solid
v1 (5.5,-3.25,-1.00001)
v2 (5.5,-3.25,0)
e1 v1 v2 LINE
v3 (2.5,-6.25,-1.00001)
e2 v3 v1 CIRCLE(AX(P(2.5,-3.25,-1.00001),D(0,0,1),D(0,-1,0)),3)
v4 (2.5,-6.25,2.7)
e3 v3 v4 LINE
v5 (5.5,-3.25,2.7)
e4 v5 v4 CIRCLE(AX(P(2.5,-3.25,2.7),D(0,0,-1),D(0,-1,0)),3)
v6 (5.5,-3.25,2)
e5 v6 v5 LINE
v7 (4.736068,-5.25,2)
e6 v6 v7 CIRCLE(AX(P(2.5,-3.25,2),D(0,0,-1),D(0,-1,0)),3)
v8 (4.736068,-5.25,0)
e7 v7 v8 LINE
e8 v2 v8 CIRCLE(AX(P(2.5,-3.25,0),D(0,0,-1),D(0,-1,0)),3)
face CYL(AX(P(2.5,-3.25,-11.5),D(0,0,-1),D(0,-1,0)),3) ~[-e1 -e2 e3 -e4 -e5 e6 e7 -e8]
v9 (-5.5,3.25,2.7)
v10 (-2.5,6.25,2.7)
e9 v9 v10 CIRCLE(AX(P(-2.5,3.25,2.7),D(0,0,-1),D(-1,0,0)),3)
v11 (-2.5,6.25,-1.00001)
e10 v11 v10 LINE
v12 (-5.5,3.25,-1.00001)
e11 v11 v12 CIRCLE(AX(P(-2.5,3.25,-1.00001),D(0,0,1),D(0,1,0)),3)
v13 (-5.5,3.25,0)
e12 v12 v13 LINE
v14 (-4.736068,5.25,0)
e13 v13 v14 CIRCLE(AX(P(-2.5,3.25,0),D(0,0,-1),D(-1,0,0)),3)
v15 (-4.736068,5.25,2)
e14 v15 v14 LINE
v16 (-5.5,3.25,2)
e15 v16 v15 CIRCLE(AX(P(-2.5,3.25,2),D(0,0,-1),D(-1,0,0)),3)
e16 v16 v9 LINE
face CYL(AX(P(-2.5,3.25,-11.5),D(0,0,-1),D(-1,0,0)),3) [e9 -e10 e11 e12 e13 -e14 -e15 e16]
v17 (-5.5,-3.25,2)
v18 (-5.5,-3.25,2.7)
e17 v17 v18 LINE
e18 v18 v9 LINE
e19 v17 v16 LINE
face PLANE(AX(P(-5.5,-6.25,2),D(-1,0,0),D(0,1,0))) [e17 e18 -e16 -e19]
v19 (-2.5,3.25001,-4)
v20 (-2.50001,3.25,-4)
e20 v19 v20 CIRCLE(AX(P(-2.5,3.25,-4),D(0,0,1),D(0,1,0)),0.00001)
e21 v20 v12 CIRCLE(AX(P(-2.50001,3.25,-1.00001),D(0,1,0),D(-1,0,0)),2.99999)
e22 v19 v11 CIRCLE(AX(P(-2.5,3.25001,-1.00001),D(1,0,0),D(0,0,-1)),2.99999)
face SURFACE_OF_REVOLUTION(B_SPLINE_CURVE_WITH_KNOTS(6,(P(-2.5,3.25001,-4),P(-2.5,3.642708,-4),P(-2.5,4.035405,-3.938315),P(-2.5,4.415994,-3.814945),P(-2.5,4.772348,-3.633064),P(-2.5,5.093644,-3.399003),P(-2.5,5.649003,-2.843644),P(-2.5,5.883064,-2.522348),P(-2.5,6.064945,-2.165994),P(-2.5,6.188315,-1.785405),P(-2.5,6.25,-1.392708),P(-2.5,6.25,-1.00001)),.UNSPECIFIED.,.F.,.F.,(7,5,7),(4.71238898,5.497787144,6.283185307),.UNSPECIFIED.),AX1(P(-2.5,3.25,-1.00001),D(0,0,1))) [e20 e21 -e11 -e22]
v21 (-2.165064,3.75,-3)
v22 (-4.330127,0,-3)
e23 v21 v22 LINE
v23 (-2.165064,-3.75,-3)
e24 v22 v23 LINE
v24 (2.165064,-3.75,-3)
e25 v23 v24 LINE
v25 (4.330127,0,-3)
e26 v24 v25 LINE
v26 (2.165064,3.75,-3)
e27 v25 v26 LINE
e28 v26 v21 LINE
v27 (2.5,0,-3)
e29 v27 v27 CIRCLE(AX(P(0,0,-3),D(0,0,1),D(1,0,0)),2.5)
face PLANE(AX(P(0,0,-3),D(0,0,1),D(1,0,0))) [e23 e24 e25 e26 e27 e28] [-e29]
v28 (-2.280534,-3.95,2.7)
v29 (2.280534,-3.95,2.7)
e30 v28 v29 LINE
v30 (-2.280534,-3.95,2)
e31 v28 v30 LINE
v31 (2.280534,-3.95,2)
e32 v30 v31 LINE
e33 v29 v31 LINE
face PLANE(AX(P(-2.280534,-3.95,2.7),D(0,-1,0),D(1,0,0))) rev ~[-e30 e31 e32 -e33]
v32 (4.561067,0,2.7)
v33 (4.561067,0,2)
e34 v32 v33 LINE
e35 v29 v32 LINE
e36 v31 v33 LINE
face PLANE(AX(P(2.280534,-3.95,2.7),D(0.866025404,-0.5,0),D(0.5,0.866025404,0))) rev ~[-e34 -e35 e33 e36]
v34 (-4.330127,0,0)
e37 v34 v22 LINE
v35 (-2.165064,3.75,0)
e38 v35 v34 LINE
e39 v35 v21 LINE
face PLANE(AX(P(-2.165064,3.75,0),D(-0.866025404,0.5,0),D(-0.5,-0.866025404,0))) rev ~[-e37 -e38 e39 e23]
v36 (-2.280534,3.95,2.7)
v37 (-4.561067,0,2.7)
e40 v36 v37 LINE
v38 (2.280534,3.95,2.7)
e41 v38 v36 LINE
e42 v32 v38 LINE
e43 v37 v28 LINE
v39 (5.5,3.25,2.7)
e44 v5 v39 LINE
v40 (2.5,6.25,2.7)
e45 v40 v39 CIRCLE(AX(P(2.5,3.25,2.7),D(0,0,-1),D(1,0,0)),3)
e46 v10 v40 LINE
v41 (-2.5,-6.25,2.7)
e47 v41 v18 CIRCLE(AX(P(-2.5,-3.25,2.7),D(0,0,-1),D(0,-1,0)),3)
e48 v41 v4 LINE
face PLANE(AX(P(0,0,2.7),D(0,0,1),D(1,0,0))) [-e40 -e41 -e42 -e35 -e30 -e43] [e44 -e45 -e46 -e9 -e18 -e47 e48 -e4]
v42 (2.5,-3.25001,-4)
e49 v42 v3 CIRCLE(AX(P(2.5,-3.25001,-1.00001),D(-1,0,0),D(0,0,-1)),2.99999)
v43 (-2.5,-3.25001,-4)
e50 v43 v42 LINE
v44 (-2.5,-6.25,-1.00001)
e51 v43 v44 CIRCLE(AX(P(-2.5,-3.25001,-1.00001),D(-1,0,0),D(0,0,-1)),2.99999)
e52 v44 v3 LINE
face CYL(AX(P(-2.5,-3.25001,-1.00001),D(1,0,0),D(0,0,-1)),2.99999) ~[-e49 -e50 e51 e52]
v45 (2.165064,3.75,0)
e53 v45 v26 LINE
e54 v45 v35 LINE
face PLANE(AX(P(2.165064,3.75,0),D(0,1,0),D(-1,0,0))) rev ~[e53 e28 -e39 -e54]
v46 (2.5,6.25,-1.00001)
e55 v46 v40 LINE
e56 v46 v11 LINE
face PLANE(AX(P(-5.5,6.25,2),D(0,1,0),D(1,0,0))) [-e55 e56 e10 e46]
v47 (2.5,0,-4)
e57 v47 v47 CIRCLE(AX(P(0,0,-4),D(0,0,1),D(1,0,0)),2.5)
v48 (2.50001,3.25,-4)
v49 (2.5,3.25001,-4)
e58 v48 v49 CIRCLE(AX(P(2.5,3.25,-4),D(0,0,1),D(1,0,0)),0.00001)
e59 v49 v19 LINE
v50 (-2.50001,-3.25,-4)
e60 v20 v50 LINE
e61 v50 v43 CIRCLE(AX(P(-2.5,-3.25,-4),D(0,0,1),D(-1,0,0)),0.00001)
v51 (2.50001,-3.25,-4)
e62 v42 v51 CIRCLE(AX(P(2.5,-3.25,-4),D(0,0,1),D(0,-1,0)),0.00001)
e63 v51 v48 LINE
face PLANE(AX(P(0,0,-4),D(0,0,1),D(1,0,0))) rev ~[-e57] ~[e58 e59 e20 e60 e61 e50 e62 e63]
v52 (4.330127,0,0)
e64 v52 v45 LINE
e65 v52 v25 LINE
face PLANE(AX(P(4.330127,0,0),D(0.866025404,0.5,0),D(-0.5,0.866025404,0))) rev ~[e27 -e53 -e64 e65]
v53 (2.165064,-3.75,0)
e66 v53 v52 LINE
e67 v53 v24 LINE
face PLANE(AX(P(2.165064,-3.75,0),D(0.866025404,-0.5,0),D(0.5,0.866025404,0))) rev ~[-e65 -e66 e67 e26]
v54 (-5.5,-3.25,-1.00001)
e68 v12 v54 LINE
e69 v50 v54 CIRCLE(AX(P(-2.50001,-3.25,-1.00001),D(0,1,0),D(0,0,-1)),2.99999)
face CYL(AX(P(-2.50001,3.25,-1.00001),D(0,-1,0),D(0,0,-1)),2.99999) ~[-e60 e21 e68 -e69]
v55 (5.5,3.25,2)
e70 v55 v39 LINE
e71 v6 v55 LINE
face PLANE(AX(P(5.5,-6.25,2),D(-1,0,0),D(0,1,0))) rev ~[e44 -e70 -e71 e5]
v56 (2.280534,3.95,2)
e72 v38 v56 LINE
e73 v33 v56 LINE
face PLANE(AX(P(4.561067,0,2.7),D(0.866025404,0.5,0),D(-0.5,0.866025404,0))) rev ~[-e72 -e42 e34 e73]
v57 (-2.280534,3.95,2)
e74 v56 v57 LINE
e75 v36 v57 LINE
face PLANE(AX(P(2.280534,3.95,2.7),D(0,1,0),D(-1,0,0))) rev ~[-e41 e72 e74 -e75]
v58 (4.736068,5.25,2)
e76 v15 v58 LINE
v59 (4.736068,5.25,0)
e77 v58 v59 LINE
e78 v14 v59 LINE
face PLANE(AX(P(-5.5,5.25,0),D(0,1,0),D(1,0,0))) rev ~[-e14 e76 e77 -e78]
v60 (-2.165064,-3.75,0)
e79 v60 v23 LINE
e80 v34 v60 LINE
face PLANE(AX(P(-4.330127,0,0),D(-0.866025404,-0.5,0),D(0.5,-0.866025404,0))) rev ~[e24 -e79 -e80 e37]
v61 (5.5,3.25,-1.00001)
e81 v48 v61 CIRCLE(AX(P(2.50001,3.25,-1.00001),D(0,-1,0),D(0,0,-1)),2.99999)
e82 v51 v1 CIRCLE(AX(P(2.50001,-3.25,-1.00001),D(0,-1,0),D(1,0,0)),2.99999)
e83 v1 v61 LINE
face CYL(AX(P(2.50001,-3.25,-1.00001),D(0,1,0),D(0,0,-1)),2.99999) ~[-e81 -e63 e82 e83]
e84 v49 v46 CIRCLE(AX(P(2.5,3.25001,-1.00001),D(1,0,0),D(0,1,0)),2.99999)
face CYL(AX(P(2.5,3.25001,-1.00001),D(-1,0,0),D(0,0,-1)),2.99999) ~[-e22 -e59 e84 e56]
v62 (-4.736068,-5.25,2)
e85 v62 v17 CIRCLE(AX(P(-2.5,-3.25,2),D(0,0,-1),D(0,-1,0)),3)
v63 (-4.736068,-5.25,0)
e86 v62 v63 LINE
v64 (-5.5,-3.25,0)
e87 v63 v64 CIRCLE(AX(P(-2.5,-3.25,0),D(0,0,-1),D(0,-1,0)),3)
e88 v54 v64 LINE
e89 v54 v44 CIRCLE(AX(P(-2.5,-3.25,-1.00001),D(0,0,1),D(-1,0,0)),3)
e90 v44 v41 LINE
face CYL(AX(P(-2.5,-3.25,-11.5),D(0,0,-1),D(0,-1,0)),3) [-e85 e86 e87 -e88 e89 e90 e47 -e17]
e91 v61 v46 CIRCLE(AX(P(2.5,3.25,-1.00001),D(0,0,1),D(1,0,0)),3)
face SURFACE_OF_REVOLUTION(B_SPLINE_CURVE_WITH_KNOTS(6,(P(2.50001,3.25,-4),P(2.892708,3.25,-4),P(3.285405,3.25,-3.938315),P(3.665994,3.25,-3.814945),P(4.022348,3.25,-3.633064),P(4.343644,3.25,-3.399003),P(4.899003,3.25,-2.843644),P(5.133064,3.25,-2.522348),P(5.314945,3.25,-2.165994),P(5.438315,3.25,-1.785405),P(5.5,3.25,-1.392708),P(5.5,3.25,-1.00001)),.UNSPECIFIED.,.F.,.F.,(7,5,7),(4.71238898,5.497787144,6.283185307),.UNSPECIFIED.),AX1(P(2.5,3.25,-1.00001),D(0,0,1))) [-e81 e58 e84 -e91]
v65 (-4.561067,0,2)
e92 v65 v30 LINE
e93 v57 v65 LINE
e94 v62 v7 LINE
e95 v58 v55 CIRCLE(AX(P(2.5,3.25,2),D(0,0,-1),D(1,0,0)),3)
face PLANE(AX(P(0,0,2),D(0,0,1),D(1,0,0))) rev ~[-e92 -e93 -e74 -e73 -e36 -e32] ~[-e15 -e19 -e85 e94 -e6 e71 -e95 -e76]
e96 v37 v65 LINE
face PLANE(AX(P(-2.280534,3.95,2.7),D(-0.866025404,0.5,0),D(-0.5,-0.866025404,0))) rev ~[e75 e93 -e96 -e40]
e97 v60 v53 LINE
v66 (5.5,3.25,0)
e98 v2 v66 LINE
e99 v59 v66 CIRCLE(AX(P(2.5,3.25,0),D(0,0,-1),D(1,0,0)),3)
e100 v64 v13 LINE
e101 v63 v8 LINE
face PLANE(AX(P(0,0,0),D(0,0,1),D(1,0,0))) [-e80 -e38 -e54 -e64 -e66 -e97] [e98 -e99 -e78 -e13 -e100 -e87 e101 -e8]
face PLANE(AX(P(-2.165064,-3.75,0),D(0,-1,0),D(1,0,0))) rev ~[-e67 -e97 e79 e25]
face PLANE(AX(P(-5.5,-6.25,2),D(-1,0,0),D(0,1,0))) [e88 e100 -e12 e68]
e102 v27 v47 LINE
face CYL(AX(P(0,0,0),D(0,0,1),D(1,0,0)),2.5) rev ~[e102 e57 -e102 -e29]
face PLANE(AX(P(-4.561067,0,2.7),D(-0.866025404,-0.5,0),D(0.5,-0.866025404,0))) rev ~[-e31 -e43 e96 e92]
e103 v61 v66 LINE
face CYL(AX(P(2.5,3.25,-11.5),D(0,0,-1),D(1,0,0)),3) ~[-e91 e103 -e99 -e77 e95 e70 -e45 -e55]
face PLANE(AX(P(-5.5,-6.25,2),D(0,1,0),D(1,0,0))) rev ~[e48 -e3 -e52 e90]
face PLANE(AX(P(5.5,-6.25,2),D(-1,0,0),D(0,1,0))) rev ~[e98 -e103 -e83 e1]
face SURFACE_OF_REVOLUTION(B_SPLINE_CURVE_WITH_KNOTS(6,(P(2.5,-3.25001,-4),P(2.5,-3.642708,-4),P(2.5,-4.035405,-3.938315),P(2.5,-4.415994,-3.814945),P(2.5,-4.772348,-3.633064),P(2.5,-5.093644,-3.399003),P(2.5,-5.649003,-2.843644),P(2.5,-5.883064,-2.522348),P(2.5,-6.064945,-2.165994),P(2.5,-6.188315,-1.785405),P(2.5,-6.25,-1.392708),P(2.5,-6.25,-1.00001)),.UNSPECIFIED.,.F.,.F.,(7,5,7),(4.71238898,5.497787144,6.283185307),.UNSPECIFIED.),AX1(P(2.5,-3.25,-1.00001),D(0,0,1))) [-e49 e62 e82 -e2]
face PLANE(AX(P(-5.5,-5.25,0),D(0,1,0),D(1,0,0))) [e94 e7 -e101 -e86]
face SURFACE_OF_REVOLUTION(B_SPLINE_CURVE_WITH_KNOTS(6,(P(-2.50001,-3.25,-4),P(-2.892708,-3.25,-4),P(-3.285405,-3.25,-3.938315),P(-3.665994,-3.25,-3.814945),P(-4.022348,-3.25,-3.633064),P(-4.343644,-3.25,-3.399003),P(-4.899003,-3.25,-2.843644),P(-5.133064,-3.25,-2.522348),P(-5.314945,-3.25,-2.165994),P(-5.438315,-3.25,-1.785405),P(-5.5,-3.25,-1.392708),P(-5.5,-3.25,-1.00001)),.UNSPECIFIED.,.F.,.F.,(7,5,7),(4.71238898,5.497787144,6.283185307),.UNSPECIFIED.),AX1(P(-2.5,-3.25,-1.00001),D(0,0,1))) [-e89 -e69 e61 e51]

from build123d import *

# Parameters (mm, degrees)
F0_W        = 11
F0_H        = 12.5
F0_R        = 2.5
F1_DEPTH    = 4
F2_R        = 2.5
F3_DEPTH    = 3
F4_W        = 11
F4_H        = 1
F5_DEPTH    = 2
F6_W        = 11
F6_H        = 12.5
F7_DEPTH    = 0.7
F8_DEPTH    = 25
F9_T1_DEPTH = 21.7
F11_DEPTH   = 2
F12_R       = 2.99999


# Not quite as in the source:
# - a fillet or chamfer that OpenCascade refuses, or shapes differently, is made with other operations: its cross-section is extruded or revolved along the edge and cut away or added
# - a fillet or chamfer is up to 0.001 mm smaller than in the source, because OpenCascade refuses the exact size


with BuildPart() as f1:
    # F0 (on Top) → F1 (new body)
    with BuildSketch(Plane.XY):
        Rectangle(F0_W, F0_H)
        Circle(F0_R, mode=Mode.SUBTRACT)
    extrude(amount=-F1_DEPTH)

    # F2 (on Top) → F3 (cut)
    with BuildSketch(Plane.XY):
        Polygon((2.1650635095, 3.75), (-2.1650635095, 3.75), (-4.3301270189, 0), (-2.1650635095, -3.75), (2.1650635095, -3.75), (4.3301270189, 0), align=None)
        Circle(F2_R, mode=Mode.SUBTRACT)
    extrude(amount=-F3_DEPTH, mode=Mode.SUBTRACT)

    # F4 (on face) → F5 (join)
    with BuildSketch(Plane.XY):
        with Locations((0, 5.75)):
            Rectangle(F4_W, F4_H)
        with Locations((0, -5.75)):
            Rectangle(F4_W, F4_H)
    extrude(amount=F5_DEPTH)

    # F6 (on face) → F7 (join)
    with BuildSketch(Plane.XY.offset(2)):
        Rectangle(F6_W, F6_H)
    extrude(amount=F7_DEPTH)

    # F2 (on Top) → F8 (cut)
    with BuildSketch(Plane.XY):
        Polygon((2.1650635095, 3.75), (-2.1650635095, 3.75), (-4.3301270189, 0), (-2.1650635095, -3.75), (2.1650635095, -3.75), (4.3301270189, 0), align=None)
        Circle(F2_R, mode=Mode.SUBTRACT)
        Circle(F2_R)
    extrude(amount=F8_DEPTH, mode=Mode.SUBTRACT)

    # F9: fillet of radius 3 on 4 edges, made by hand

    # F9_s2 → F9_t1 (cut)
    with BuildSketch(Plane.XY.offset(-11.5)):
        with BuildLine():
            ThreePointArc((-2.5, -6.25), (-4.6213203436, -5.3713203436), (-5.5, -3.25))
            Line((-5.5, -3.25), (-5.5, -6.25))
            Line((-5.5, -6.25), (-2.5, -6.25))
        make_face()
        with BuildLine():
            ThreePointArc((2.5, -6.25), (4.6213203436, -5.3713203436), (5.5, -3.25))
            Line((5.5, -3.25), (5.5, -6.25))
            Line((5.5, -6.25), (2.5, -6.25))
        make_face()
        with BuildLine():
            ThreePointArc((5.5, 3.25), (4.6213203436, 5.3713203436), (2.5, 6.25))
            Line((2.5, 6.25), (5.5, 6.25))
            Line((5.5, 6.25), (5.5, 3.25))
        make_face()
        with BuildLine():
            ThreePointArc((-5.5, 3.25), (-4.6213203436, 5.3713203436), (-2.5, 6.25))
            Line((-2.5, 6.25), (-5.5, 6.25))
            Line((-5.5, 6.25), (-5.5, 3.25))
        make_face()
    extrude(amount=F9_T1_DEPTH, mode=Mode.SUBTRACT)

    # F10 (on face) → F11 (cut)
    with BuildSketch(Plane.XY.offset(2.7)):
        Polygon((2.2805335633, 3.95), (-2.2805335633, 3.95), (-4.5610671266, 0), (-2.2805335633, -3.95), (2.2805335633, -3.95), (4.5610671266, 0), align=None)
    extrude(amount=-F11_DEPTH, mode=Mode.SUBTRACT)

    # F12 (radius 3 in the source; OpenCascade refuses exactly that, so slightly less here)
    f12_edges = [f1.edges().sort_by_distance(p)[0] for p in [
        (0, -6.25, -4),
    ]]
    fillet(f12_edges, radius=F12_R)


solid = f1.part
